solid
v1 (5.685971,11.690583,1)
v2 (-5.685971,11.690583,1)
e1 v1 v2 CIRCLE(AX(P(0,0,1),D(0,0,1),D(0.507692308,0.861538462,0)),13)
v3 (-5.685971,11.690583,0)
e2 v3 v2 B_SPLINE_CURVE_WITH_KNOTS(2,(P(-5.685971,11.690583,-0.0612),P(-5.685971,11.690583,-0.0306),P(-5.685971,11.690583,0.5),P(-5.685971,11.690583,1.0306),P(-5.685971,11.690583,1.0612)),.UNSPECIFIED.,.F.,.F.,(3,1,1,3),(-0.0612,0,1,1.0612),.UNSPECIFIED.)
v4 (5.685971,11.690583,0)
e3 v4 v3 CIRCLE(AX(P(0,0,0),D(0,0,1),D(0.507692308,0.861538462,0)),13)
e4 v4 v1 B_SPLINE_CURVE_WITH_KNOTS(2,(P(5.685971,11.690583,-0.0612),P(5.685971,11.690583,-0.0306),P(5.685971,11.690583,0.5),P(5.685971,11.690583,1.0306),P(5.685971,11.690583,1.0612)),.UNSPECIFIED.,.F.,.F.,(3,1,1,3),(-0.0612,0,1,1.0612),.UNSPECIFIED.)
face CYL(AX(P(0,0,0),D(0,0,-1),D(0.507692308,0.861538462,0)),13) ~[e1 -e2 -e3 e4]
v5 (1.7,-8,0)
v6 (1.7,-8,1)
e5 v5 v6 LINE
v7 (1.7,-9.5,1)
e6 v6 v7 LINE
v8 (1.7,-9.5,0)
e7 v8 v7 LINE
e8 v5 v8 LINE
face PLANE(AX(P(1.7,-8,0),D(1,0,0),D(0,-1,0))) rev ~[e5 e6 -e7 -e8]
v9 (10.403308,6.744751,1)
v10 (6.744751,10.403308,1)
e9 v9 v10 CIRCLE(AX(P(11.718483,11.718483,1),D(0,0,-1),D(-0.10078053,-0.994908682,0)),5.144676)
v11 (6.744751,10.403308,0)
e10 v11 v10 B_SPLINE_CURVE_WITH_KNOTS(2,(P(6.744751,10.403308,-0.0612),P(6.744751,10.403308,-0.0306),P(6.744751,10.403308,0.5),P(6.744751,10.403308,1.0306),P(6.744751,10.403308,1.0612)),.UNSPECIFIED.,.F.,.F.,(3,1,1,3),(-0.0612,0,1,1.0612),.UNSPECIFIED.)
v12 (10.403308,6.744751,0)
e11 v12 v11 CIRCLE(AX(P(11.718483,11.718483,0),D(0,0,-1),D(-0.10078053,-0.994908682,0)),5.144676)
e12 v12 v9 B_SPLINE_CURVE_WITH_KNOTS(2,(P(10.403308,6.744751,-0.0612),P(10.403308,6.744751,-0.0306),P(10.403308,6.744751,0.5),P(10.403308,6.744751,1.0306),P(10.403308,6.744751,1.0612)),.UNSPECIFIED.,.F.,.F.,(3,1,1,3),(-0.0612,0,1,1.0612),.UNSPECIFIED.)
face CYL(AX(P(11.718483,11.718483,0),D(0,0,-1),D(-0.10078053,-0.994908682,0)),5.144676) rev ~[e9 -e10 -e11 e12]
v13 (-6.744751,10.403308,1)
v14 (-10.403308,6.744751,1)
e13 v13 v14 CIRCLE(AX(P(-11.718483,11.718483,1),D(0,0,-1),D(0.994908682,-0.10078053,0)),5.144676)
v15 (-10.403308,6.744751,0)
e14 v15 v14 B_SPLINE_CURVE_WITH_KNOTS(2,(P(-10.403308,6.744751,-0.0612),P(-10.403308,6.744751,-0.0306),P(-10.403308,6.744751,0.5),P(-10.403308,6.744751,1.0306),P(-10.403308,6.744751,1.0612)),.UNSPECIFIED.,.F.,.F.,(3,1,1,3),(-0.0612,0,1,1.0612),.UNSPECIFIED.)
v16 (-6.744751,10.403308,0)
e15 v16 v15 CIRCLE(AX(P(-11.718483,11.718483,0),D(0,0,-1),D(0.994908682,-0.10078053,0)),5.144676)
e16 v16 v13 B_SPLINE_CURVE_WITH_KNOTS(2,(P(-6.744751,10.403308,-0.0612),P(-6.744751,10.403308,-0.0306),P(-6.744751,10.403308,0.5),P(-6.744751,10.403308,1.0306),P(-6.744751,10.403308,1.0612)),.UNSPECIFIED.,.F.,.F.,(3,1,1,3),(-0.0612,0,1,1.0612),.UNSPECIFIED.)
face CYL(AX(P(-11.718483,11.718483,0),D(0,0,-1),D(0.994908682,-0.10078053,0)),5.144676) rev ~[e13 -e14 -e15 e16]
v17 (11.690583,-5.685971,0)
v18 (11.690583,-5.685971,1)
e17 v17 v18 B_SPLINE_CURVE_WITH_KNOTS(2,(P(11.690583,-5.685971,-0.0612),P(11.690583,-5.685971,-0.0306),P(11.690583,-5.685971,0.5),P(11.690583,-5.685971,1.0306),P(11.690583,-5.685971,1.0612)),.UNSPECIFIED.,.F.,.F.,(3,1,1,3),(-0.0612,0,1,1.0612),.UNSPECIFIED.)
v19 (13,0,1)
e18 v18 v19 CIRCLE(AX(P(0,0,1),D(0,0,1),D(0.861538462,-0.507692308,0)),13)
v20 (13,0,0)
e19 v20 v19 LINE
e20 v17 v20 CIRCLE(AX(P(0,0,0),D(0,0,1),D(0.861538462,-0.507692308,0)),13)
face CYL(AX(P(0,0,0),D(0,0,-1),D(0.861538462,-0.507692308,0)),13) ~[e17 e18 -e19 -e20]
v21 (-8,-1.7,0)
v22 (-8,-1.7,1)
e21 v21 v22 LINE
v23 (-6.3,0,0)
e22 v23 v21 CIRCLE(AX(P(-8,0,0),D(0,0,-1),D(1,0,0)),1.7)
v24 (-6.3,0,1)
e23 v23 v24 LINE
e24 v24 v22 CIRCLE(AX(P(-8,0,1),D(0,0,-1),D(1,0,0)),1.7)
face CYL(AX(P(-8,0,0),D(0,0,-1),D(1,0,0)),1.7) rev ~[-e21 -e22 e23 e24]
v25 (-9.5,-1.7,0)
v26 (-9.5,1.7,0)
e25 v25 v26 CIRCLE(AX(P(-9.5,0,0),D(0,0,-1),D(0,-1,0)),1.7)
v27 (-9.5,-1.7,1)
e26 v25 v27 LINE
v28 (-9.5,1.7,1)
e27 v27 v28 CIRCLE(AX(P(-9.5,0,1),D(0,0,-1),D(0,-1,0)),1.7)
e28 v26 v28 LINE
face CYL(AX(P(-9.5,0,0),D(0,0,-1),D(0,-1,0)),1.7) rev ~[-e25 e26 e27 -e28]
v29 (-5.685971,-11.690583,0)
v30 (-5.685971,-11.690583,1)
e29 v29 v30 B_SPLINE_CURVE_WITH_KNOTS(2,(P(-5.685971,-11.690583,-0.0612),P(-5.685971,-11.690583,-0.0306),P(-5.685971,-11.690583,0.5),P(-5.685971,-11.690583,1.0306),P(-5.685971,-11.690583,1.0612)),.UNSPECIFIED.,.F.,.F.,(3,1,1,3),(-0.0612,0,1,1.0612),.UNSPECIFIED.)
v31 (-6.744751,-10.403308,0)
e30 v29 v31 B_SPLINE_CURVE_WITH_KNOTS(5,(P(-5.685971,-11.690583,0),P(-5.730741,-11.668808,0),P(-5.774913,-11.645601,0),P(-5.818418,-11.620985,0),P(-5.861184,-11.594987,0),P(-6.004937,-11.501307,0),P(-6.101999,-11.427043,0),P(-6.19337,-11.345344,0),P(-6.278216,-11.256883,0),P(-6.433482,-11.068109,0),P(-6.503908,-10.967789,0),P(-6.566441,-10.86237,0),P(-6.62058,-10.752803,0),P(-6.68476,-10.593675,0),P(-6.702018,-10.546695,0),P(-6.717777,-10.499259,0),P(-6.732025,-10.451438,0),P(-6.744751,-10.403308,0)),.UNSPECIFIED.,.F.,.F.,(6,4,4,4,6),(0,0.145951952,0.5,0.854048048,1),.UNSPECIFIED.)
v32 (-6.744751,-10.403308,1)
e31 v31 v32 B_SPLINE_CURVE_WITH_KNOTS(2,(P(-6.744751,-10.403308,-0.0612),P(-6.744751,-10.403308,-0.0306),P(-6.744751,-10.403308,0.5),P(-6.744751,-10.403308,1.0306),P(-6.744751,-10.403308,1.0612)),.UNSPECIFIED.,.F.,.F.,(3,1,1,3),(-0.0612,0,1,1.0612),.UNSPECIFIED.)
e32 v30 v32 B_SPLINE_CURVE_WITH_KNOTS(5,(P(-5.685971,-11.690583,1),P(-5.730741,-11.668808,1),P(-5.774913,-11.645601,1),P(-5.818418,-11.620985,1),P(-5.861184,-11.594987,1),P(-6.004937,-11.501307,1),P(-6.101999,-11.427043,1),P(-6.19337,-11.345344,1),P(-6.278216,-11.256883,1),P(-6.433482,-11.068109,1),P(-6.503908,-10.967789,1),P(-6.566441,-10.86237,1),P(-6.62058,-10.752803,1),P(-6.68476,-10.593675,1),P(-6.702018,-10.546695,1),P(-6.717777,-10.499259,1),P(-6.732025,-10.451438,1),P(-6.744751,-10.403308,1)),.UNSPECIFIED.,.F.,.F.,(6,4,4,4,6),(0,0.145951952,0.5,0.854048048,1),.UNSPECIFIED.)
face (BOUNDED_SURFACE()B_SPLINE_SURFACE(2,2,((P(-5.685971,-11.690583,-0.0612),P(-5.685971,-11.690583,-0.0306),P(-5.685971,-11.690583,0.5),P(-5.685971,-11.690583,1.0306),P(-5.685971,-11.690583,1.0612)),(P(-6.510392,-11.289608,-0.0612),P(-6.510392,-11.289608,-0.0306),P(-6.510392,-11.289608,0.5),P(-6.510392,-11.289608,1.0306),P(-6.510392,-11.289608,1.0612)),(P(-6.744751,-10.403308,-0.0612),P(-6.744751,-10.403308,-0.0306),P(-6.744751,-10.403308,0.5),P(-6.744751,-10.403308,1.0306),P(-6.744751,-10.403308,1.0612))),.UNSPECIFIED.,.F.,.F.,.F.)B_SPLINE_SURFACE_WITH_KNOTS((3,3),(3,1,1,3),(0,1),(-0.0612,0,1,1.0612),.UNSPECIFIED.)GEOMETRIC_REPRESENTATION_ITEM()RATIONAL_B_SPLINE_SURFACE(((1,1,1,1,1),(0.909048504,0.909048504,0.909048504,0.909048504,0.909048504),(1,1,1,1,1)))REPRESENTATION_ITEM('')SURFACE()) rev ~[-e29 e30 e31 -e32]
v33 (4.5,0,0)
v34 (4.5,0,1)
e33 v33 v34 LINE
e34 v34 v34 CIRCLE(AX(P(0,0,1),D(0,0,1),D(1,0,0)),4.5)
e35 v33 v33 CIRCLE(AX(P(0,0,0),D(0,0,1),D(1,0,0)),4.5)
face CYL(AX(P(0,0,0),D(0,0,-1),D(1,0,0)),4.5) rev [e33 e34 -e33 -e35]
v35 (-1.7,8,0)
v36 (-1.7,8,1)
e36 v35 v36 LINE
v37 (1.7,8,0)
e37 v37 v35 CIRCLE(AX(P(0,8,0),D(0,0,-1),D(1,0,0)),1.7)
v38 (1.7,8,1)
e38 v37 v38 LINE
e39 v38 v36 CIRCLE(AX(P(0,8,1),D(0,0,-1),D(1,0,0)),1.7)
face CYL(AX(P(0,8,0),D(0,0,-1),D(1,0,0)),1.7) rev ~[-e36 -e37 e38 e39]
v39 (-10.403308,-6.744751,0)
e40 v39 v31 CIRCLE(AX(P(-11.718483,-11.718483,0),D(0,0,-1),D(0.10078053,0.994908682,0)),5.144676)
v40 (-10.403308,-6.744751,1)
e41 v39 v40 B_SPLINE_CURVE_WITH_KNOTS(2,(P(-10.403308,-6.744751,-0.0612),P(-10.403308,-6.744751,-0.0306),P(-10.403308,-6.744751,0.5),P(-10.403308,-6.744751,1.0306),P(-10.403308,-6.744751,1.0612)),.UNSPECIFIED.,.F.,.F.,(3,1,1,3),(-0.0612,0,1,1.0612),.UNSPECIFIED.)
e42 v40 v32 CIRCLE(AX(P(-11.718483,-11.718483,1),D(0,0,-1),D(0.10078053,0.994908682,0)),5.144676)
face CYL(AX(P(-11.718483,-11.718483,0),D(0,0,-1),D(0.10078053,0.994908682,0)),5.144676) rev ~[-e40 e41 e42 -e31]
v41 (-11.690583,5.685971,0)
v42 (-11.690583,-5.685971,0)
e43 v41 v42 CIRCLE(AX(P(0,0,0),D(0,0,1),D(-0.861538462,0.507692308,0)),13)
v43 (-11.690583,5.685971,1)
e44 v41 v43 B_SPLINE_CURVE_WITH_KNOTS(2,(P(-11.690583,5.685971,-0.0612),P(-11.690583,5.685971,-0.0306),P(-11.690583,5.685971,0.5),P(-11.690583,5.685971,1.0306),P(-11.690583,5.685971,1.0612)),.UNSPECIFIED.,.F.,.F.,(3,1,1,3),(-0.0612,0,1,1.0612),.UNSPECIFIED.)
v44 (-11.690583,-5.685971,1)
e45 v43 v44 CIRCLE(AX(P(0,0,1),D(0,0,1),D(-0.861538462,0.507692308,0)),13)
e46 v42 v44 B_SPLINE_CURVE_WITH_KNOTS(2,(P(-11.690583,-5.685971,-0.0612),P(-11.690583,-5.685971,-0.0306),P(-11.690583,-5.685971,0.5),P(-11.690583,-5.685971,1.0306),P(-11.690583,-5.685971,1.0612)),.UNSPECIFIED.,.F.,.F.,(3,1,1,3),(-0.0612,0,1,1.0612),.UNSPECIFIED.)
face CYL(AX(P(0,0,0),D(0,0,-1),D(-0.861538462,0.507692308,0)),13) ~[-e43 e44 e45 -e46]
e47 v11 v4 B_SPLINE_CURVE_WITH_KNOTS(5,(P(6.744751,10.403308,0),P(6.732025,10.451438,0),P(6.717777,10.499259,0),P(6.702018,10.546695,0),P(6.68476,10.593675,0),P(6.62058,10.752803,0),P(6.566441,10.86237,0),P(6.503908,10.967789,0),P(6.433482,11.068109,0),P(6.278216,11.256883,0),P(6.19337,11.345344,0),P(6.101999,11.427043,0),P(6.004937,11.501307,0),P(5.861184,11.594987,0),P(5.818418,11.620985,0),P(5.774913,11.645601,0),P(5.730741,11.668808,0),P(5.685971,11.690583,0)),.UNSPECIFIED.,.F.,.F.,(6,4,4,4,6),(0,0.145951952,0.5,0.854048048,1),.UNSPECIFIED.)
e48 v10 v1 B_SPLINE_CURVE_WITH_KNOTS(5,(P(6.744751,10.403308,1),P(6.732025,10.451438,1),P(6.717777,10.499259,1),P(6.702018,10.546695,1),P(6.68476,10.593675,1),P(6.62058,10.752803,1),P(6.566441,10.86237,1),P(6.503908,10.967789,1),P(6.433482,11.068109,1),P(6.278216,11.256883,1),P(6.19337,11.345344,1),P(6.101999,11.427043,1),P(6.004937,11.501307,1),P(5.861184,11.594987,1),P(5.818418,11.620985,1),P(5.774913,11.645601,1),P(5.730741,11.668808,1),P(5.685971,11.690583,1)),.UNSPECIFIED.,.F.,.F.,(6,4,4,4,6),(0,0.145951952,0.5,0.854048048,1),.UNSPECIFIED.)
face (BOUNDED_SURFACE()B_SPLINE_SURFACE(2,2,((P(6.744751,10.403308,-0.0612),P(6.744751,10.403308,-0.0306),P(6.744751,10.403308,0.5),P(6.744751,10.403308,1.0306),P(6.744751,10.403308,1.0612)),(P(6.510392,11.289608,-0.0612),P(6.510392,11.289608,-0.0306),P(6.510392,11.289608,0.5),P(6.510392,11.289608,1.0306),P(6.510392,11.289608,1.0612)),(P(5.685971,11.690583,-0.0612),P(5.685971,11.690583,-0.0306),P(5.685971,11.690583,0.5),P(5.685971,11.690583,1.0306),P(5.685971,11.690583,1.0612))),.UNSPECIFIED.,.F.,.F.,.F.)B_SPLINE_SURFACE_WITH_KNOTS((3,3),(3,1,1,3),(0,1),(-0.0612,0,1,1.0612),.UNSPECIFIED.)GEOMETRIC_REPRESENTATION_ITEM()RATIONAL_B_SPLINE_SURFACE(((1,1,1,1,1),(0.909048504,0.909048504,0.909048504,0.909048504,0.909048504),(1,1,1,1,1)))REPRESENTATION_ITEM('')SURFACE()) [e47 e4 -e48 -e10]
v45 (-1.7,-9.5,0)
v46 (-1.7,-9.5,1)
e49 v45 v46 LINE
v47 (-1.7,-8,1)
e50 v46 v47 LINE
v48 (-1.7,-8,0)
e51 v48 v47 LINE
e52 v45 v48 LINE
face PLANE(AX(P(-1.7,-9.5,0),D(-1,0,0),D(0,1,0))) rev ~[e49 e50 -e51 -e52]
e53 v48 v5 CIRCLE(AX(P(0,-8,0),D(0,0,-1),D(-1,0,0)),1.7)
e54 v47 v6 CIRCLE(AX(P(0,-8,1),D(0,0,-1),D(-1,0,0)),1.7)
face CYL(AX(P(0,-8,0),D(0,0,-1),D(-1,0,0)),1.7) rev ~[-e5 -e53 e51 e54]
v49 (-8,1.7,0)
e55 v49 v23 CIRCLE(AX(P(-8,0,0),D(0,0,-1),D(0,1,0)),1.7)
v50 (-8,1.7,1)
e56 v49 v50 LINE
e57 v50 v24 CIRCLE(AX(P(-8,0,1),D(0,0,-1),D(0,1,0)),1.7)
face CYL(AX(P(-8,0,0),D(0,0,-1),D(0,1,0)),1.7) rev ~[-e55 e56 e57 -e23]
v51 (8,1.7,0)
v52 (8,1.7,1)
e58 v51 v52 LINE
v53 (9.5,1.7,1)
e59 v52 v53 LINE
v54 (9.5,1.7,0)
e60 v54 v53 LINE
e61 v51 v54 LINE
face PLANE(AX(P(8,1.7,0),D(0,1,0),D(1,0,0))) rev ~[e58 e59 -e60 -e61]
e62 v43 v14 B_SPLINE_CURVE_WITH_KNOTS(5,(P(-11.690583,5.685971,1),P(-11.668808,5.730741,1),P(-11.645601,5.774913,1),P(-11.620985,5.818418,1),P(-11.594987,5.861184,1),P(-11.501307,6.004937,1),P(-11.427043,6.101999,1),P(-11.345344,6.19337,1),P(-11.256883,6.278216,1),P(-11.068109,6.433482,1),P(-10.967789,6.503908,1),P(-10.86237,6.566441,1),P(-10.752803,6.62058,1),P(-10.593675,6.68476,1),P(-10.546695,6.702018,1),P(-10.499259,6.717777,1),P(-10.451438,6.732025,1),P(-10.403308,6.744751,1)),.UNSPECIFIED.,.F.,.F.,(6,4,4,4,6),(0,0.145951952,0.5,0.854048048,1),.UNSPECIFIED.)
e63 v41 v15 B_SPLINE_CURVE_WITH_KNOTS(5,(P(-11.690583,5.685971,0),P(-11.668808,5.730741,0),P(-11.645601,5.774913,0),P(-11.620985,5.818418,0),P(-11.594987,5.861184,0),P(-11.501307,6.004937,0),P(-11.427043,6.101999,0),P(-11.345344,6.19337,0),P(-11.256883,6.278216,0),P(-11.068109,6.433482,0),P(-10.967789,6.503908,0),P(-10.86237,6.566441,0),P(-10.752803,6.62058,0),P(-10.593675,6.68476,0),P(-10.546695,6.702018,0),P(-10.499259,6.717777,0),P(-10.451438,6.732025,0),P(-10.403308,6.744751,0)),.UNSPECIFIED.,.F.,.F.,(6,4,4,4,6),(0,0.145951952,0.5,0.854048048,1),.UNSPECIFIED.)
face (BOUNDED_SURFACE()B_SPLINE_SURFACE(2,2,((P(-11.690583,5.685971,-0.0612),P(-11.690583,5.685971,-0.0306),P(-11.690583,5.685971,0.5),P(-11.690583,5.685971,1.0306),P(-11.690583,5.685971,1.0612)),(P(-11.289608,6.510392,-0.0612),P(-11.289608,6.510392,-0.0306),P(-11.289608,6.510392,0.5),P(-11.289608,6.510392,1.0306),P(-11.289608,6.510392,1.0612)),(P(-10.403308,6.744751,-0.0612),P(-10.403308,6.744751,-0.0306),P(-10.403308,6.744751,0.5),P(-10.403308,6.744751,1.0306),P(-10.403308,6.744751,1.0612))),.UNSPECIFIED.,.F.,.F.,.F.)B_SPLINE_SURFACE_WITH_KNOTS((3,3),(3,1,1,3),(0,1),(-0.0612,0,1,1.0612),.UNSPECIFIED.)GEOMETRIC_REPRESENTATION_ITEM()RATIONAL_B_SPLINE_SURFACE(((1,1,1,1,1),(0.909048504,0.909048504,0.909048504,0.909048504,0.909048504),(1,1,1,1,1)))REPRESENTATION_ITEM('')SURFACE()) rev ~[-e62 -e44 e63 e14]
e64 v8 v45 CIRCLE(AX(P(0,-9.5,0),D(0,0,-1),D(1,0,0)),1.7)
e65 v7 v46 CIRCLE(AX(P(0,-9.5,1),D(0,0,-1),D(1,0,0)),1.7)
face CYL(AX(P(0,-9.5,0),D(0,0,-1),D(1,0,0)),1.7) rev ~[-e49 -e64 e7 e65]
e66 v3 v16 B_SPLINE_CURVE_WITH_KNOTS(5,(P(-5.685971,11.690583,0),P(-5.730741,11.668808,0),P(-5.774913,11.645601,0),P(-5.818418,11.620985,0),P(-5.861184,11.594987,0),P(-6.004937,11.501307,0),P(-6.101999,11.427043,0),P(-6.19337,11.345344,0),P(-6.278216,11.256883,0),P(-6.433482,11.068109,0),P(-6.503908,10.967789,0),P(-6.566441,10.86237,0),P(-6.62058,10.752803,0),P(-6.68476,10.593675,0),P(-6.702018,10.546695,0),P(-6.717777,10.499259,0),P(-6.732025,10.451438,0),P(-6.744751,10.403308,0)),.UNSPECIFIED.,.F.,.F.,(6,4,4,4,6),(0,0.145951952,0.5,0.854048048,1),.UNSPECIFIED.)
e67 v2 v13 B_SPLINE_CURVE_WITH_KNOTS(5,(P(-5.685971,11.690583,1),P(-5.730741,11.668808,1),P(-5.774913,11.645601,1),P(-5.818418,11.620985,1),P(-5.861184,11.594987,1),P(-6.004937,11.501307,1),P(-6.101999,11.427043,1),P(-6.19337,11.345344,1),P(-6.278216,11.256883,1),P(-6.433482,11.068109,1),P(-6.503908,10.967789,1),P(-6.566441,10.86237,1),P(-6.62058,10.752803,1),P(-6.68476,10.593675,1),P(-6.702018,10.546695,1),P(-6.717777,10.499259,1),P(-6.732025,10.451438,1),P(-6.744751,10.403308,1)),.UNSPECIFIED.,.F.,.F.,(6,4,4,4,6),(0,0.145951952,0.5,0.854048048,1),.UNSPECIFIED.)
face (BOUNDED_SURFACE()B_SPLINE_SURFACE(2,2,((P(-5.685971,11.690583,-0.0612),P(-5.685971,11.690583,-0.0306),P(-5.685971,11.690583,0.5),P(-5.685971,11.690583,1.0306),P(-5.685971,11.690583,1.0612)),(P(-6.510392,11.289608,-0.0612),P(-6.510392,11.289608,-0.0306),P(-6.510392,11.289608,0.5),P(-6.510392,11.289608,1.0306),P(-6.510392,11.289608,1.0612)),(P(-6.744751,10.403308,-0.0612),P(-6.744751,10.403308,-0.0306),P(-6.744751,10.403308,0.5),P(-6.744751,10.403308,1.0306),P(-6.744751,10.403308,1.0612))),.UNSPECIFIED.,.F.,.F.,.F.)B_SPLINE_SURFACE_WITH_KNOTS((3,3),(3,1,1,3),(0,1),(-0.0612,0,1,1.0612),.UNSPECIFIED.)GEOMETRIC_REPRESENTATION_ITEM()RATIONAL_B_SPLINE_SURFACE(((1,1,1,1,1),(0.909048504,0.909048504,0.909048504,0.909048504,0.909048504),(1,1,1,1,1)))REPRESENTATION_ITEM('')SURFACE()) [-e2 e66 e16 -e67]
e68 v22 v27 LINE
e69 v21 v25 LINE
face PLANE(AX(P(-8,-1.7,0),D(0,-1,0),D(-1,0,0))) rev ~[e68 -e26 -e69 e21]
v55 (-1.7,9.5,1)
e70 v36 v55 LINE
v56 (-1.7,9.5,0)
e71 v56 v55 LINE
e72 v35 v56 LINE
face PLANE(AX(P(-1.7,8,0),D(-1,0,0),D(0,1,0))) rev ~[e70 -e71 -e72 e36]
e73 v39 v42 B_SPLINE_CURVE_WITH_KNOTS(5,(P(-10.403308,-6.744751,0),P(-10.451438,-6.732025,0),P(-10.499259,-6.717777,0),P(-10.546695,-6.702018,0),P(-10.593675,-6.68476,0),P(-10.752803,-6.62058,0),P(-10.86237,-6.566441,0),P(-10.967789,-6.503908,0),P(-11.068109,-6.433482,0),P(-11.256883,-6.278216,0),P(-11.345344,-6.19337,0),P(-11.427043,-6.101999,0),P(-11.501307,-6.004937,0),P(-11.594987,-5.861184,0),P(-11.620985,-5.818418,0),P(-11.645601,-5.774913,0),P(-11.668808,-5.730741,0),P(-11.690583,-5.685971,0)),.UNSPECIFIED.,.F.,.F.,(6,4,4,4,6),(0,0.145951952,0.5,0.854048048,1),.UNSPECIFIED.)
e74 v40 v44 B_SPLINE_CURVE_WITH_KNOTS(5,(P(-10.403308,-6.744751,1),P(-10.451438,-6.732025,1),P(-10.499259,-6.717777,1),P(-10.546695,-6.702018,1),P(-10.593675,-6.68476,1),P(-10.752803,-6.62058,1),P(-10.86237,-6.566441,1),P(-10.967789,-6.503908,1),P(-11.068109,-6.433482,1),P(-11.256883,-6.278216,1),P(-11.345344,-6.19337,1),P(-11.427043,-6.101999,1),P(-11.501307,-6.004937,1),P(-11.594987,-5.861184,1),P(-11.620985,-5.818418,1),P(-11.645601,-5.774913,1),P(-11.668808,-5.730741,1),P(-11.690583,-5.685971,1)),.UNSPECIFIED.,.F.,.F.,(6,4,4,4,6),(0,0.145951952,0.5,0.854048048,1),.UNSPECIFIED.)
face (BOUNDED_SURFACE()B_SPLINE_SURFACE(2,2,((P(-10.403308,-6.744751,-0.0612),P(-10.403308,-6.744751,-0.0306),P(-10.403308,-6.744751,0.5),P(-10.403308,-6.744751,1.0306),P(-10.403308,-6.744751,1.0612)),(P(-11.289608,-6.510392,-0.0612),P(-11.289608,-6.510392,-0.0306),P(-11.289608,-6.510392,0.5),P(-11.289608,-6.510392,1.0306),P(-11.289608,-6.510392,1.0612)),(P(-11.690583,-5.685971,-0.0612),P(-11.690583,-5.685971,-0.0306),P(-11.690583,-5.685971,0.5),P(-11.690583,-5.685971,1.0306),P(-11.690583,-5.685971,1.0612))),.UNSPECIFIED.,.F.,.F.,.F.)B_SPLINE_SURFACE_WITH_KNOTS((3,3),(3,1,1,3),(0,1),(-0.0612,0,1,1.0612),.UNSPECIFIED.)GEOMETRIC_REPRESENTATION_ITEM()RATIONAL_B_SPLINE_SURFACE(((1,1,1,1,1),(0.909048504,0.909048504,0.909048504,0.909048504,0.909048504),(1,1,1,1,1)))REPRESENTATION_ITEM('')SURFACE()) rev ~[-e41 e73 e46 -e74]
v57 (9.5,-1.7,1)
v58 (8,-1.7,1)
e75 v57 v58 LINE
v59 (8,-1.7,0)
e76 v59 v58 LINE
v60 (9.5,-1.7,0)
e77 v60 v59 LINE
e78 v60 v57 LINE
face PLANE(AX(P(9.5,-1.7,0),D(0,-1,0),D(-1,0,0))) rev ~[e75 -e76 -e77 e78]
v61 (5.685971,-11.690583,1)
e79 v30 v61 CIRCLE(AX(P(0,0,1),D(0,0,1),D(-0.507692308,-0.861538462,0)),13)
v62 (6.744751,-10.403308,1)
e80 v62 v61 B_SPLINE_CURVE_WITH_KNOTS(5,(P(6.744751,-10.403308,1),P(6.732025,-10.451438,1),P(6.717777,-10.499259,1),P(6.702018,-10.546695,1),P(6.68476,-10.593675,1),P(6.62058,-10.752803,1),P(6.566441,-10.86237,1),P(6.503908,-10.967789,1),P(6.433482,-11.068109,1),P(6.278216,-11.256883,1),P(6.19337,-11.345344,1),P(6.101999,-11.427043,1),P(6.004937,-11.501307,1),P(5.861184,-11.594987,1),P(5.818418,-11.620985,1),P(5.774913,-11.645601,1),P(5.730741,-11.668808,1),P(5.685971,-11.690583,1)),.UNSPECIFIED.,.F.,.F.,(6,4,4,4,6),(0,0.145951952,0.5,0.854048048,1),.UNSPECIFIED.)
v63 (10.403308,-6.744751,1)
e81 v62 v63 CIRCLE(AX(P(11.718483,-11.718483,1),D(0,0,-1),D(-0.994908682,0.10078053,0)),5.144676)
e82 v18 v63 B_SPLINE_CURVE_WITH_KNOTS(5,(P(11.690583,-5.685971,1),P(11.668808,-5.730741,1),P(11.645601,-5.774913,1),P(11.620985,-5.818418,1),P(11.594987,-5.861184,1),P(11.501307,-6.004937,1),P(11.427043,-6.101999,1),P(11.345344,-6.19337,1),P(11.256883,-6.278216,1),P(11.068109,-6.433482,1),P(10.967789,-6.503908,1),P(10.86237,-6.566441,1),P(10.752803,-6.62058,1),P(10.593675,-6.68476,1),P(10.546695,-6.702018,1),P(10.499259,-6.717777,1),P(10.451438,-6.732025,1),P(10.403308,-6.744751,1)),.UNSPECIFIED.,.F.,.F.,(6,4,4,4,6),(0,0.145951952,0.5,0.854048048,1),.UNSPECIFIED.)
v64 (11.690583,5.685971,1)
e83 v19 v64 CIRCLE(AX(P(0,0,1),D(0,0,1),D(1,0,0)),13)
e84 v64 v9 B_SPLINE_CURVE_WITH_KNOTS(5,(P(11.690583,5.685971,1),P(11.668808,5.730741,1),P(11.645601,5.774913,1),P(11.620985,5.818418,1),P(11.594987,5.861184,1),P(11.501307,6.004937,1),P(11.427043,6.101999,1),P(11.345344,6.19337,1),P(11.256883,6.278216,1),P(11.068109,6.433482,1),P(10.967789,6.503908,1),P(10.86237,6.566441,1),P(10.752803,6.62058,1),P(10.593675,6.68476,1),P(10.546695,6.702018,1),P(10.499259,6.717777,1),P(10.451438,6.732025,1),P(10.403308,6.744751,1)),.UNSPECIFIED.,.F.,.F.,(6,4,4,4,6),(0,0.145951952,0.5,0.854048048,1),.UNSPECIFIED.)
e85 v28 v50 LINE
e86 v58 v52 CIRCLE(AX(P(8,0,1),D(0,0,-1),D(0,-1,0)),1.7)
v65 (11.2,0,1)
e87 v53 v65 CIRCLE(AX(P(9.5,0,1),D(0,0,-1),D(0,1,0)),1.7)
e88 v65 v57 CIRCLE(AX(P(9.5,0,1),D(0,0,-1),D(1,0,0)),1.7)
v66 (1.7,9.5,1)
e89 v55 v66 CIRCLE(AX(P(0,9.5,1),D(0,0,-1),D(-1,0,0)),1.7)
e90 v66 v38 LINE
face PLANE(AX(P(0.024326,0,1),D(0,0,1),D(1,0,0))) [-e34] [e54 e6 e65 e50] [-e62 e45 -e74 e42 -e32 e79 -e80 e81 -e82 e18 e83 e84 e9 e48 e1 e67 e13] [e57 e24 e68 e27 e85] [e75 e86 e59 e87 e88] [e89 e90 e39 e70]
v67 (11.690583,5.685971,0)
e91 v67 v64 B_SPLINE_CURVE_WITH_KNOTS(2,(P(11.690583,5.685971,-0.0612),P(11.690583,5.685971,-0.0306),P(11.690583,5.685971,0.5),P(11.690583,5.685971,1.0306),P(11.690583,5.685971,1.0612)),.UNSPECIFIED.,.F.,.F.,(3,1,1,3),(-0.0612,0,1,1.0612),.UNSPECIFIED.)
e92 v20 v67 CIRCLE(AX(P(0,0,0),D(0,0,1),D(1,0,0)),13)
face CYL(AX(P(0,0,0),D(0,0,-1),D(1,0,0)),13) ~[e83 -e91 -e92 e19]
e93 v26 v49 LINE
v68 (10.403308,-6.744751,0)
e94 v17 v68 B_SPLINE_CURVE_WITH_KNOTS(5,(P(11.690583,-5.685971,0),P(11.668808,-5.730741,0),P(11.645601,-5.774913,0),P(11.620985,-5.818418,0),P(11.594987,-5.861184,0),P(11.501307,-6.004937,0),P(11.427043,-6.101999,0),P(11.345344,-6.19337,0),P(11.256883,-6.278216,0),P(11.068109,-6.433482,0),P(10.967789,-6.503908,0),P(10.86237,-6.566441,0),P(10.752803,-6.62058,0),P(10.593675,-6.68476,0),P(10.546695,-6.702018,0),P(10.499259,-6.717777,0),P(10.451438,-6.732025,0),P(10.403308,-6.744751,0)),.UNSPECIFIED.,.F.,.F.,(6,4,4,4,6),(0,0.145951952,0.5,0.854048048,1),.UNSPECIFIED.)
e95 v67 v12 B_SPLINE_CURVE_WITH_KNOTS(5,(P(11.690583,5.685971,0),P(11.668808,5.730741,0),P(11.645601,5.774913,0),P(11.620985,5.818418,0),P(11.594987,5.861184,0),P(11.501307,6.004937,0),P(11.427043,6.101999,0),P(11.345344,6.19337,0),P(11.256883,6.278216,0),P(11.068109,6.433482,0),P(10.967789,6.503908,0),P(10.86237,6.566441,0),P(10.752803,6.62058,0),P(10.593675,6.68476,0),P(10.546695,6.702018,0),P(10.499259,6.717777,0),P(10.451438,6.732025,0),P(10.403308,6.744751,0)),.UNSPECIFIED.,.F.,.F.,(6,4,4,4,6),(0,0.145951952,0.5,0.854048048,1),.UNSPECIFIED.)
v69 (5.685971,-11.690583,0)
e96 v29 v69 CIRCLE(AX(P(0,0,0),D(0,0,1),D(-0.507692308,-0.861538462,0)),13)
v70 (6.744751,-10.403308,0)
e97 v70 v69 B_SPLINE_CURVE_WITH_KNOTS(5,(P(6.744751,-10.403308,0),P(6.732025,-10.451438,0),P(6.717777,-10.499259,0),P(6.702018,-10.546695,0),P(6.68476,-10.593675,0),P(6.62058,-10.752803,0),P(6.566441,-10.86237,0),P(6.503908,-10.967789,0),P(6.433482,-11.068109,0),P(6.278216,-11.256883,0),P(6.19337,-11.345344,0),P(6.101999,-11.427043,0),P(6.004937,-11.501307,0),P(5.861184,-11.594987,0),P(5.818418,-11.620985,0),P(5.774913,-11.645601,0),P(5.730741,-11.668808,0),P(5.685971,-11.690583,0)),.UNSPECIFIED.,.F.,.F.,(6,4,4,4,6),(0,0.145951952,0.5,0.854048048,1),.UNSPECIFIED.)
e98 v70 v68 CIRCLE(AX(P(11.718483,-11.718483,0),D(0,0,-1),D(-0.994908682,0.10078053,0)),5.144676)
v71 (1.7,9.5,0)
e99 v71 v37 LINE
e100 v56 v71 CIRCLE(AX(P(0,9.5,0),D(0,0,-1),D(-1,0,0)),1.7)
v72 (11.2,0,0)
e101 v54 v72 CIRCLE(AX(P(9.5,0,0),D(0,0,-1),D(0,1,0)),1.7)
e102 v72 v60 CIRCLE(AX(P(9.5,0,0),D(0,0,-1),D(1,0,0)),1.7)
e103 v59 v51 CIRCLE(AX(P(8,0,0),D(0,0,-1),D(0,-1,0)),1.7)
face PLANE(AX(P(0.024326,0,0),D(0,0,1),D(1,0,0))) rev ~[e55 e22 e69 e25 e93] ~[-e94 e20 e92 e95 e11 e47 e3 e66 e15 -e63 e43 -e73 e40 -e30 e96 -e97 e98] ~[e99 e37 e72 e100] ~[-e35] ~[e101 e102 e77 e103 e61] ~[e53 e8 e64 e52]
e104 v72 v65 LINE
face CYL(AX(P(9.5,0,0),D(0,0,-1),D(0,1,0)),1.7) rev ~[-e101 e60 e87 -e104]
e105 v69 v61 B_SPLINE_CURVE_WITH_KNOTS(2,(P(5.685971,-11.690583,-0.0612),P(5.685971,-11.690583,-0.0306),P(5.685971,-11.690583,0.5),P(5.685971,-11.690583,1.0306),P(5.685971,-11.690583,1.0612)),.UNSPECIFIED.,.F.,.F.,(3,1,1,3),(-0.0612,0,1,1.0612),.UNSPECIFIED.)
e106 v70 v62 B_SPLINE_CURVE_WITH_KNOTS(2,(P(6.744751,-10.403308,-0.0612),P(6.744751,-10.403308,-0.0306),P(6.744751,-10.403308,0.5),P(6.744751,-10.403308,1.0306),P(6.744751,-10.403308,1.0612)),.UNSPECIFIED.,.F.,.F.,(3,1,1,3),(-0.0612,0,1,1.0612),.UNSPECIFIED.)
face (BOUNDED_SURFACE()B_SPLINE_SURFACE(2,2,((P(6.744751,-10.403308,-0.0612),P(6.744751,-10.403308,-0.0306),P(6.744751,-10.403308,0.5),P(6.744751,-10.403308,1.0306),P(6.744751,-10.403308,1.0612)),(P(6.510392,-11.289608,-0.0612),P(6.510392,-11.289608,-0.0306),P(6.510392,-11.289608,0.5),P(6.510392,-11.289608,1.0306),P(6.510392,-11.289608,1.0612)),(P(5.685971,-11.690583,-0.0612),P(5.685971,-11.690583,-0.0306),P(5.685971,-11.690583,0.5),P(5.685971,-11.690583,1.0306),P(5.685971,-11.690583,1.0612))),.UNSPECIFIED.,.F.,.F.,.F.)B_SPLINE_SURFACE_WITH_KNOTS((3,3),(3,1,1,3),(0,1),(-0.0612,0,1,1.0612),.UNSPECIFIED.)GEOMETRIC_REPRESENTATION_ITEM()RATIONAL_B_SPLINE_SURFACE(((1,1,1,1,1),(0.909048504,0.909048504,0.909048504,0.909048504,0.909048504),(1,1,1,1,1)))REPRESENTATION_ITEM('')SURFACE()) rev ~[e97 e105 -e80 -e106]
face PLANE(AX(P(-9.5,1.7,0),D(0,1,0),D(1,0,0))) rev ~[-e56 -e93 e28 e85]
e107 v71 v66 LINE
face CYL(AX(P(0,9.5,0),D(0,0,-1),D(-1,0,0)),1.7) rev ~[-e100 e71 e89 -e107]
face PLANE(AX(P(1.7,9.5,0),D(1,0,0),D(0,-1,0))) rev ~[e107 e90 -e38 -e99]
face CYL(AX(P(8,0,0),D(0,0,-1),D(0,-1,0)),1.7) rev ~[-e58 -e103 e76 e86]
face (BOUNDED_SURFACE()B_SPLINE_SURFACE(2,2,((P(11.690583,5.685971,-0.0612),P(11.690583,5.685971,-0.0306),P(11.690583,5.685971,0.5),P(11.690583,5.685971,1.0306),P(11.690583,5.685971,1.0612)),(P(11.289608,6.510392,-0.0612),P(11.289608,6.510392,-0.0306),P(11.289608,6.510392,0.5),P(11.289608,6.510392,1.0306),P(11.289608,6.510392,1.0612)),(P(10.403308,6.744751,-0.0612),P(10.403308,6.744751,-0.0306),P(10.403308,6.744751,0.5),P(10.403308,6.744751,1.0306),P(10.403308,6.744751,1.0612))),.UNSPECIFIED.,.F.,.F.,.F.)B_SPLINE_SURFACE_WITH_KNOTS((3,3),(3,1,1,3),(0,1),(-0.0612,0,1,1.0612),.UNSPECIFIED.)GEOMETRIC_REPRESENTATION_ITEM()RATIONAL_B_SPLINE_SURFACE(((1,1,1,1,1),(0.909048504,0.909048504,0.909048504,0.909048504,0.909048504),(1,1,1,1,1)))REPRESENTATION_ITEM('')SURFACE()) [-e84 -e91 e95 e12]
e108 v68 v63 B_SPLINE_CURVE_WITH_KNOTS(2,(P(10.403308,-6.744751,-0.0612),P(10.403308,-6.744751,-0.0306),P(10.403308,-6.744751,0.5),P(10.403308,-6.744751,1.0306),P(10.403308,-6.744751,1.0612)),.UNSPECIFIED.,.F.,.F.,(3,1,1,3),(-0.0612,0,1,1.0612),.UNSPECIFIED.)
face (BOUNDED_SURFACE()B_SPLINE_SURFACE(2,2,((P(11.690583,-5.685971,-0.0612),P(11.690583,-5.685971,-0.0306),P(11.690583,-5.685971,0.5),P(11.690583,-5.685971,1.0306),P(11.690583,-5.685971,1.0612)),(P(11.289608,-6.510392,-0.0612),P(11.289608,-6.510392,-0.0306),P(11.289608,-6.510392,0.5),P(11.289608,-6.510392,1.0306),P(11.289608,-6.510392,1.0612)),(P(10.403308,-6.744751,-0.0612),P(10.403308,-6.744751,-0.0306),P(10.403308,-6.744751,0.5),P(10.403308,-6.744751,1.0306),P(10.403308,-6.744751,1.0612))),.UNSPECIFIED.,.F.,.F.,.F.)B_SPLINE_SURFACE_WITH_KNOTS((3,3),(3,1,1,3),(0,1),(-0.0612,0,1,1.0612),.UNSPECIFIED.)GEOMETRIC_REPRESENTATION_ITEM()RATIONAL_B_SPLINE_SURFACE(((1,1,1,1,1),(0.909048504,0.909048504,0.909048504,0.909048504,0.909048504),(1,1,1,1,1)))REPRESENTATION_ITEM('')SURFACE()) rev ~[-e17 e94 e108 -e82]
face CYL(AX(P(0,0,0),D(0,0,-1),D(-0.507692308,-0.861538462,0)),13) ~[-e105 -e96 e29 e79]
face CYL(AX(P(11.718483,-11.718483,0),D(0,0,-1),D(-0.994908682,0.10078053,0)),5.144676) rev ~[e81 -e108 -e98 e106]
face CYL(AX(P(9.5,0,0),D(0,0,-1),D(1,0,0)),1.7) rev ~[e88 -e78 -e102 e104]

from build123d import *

# Parameters (mm, degrees)
F2_R     = 4.5
F3_DEPTH = 1
F4_R     = 2


with BuildPart() as f3:
    # F2 (on Top) → F3 (new body)
    with BuildSketch(Plane.XY):
        with BuildLine():
            ThreePointArc((11.2, -6.6), (12.5419296761, -3.4205262753), (13, 0))
            ThreePointArc((13, 0), (12.5419296761, 3.4205262753), (11.2, 6.6))
            ThreePointArc((11.2, 6.6), (8.0806476452, 8.0806476452), (6.6, 11.2))
            ThreePointArc((6.6, 11.2), (0, 13), (-6.6, 11.2))
            ThreePointArc((-6.6, 11.2), (-8.0806476452, 8.0806476452), (-11.2, 6.6))
            ThreePointArc((-11.2, 6.6), (-13, 0), (-11.2, -6.6))
            ThreePointArc((-11.2, -6.6), (-8.0806476452, -8.0806476452), (-6.6, -11.2))
            ThreePointArc((-6.6, -11.2), (0, -13), (6.6, -11.2))
            ThreePointArc((6.6, -11.2), (8.0806476452, -8.0806476452), (11.2, -6.6))
        make_face()
        with BuildLine():
            ThreePointArc((-1.7, -8), (0, -6.3), (1.7, -8))
            Line((1.7, -8), (1.7, -9.5))
            ThreePointArc((1.7, -9.5), (0, -11.2), (-1.7, -9.5))
            Line((-1.7, -9.5), (-1.7, -8))
        make_face(mode=Mode.SUBTRACT)
        with BuildLine():
            ThreePointArc((-9.5, -1.7), (-11.2, 0), (-9.5, 1.7))
            Line((-9.5, 1.7), (-8, 1.7))
            ThreePointArc((-8, 1.7), (-6.797918472, 1.202081528), (-6.3, 0))
            ThreePointArc((-6.3, 0), (-6.797918472, -1.202081528), (-8, -1.7))
            Line((-8, -1.7), (-9.5, -1.7))
        make_face(mode=Mode.SUBTRACT)
        Circle(F2_R, mode=Mode.SUBTRACT)
        with BuildLine():
            ThreePointArc((8, -1.7), (6.3, 0), (8, 1.7))
            Line((8, 1.7), (9.5, 1.7))
            ThreePointArc((9.5, 1.7), (10.702081528, 1.202081528), (11.2, 0))
            ThreePointArc((11.2, 0), (10.702081528, -1.202081528), (9.5, -1.7))
            Line((9.5, -1.7), (8, -1.7))
        make_face(mode=Mode.SUBTRACT)
        with BuildLine():
            ThreePointArc((-1.7, 9.5), (0, 11.2), (1.7, 9.5))
            Line((1.7, 9.5), (1.7, 8))
            ThreePointArc((1.7, 8), (0, 6.3), (-1.7, 8))
            Line((-1.7, 8), (-1.7, 9.5))
        make_face(mode=Mode.SUBTRACT)
    extrude(amount=F3_DEPTH)

    # F4
    f4_edges = [f3.edges().sort_by_distance(p)[0] for p in [
        (-11.2, -6.6, 0.5),
        (11.2, -6.6, 0.5),
        (11.2, 6.6, 0.5),
        (-11.2, 6.6, 0.5),
        (6.6, -11.2, 0.5),
        (-6.6, -11.2, 0.5),
        (-6.6, 11.2, 0.5),
        (6.6, 11.2, 0.5),
    ]]
    fillet(f4_edges, radius=F4_R)


solid = f3.part
